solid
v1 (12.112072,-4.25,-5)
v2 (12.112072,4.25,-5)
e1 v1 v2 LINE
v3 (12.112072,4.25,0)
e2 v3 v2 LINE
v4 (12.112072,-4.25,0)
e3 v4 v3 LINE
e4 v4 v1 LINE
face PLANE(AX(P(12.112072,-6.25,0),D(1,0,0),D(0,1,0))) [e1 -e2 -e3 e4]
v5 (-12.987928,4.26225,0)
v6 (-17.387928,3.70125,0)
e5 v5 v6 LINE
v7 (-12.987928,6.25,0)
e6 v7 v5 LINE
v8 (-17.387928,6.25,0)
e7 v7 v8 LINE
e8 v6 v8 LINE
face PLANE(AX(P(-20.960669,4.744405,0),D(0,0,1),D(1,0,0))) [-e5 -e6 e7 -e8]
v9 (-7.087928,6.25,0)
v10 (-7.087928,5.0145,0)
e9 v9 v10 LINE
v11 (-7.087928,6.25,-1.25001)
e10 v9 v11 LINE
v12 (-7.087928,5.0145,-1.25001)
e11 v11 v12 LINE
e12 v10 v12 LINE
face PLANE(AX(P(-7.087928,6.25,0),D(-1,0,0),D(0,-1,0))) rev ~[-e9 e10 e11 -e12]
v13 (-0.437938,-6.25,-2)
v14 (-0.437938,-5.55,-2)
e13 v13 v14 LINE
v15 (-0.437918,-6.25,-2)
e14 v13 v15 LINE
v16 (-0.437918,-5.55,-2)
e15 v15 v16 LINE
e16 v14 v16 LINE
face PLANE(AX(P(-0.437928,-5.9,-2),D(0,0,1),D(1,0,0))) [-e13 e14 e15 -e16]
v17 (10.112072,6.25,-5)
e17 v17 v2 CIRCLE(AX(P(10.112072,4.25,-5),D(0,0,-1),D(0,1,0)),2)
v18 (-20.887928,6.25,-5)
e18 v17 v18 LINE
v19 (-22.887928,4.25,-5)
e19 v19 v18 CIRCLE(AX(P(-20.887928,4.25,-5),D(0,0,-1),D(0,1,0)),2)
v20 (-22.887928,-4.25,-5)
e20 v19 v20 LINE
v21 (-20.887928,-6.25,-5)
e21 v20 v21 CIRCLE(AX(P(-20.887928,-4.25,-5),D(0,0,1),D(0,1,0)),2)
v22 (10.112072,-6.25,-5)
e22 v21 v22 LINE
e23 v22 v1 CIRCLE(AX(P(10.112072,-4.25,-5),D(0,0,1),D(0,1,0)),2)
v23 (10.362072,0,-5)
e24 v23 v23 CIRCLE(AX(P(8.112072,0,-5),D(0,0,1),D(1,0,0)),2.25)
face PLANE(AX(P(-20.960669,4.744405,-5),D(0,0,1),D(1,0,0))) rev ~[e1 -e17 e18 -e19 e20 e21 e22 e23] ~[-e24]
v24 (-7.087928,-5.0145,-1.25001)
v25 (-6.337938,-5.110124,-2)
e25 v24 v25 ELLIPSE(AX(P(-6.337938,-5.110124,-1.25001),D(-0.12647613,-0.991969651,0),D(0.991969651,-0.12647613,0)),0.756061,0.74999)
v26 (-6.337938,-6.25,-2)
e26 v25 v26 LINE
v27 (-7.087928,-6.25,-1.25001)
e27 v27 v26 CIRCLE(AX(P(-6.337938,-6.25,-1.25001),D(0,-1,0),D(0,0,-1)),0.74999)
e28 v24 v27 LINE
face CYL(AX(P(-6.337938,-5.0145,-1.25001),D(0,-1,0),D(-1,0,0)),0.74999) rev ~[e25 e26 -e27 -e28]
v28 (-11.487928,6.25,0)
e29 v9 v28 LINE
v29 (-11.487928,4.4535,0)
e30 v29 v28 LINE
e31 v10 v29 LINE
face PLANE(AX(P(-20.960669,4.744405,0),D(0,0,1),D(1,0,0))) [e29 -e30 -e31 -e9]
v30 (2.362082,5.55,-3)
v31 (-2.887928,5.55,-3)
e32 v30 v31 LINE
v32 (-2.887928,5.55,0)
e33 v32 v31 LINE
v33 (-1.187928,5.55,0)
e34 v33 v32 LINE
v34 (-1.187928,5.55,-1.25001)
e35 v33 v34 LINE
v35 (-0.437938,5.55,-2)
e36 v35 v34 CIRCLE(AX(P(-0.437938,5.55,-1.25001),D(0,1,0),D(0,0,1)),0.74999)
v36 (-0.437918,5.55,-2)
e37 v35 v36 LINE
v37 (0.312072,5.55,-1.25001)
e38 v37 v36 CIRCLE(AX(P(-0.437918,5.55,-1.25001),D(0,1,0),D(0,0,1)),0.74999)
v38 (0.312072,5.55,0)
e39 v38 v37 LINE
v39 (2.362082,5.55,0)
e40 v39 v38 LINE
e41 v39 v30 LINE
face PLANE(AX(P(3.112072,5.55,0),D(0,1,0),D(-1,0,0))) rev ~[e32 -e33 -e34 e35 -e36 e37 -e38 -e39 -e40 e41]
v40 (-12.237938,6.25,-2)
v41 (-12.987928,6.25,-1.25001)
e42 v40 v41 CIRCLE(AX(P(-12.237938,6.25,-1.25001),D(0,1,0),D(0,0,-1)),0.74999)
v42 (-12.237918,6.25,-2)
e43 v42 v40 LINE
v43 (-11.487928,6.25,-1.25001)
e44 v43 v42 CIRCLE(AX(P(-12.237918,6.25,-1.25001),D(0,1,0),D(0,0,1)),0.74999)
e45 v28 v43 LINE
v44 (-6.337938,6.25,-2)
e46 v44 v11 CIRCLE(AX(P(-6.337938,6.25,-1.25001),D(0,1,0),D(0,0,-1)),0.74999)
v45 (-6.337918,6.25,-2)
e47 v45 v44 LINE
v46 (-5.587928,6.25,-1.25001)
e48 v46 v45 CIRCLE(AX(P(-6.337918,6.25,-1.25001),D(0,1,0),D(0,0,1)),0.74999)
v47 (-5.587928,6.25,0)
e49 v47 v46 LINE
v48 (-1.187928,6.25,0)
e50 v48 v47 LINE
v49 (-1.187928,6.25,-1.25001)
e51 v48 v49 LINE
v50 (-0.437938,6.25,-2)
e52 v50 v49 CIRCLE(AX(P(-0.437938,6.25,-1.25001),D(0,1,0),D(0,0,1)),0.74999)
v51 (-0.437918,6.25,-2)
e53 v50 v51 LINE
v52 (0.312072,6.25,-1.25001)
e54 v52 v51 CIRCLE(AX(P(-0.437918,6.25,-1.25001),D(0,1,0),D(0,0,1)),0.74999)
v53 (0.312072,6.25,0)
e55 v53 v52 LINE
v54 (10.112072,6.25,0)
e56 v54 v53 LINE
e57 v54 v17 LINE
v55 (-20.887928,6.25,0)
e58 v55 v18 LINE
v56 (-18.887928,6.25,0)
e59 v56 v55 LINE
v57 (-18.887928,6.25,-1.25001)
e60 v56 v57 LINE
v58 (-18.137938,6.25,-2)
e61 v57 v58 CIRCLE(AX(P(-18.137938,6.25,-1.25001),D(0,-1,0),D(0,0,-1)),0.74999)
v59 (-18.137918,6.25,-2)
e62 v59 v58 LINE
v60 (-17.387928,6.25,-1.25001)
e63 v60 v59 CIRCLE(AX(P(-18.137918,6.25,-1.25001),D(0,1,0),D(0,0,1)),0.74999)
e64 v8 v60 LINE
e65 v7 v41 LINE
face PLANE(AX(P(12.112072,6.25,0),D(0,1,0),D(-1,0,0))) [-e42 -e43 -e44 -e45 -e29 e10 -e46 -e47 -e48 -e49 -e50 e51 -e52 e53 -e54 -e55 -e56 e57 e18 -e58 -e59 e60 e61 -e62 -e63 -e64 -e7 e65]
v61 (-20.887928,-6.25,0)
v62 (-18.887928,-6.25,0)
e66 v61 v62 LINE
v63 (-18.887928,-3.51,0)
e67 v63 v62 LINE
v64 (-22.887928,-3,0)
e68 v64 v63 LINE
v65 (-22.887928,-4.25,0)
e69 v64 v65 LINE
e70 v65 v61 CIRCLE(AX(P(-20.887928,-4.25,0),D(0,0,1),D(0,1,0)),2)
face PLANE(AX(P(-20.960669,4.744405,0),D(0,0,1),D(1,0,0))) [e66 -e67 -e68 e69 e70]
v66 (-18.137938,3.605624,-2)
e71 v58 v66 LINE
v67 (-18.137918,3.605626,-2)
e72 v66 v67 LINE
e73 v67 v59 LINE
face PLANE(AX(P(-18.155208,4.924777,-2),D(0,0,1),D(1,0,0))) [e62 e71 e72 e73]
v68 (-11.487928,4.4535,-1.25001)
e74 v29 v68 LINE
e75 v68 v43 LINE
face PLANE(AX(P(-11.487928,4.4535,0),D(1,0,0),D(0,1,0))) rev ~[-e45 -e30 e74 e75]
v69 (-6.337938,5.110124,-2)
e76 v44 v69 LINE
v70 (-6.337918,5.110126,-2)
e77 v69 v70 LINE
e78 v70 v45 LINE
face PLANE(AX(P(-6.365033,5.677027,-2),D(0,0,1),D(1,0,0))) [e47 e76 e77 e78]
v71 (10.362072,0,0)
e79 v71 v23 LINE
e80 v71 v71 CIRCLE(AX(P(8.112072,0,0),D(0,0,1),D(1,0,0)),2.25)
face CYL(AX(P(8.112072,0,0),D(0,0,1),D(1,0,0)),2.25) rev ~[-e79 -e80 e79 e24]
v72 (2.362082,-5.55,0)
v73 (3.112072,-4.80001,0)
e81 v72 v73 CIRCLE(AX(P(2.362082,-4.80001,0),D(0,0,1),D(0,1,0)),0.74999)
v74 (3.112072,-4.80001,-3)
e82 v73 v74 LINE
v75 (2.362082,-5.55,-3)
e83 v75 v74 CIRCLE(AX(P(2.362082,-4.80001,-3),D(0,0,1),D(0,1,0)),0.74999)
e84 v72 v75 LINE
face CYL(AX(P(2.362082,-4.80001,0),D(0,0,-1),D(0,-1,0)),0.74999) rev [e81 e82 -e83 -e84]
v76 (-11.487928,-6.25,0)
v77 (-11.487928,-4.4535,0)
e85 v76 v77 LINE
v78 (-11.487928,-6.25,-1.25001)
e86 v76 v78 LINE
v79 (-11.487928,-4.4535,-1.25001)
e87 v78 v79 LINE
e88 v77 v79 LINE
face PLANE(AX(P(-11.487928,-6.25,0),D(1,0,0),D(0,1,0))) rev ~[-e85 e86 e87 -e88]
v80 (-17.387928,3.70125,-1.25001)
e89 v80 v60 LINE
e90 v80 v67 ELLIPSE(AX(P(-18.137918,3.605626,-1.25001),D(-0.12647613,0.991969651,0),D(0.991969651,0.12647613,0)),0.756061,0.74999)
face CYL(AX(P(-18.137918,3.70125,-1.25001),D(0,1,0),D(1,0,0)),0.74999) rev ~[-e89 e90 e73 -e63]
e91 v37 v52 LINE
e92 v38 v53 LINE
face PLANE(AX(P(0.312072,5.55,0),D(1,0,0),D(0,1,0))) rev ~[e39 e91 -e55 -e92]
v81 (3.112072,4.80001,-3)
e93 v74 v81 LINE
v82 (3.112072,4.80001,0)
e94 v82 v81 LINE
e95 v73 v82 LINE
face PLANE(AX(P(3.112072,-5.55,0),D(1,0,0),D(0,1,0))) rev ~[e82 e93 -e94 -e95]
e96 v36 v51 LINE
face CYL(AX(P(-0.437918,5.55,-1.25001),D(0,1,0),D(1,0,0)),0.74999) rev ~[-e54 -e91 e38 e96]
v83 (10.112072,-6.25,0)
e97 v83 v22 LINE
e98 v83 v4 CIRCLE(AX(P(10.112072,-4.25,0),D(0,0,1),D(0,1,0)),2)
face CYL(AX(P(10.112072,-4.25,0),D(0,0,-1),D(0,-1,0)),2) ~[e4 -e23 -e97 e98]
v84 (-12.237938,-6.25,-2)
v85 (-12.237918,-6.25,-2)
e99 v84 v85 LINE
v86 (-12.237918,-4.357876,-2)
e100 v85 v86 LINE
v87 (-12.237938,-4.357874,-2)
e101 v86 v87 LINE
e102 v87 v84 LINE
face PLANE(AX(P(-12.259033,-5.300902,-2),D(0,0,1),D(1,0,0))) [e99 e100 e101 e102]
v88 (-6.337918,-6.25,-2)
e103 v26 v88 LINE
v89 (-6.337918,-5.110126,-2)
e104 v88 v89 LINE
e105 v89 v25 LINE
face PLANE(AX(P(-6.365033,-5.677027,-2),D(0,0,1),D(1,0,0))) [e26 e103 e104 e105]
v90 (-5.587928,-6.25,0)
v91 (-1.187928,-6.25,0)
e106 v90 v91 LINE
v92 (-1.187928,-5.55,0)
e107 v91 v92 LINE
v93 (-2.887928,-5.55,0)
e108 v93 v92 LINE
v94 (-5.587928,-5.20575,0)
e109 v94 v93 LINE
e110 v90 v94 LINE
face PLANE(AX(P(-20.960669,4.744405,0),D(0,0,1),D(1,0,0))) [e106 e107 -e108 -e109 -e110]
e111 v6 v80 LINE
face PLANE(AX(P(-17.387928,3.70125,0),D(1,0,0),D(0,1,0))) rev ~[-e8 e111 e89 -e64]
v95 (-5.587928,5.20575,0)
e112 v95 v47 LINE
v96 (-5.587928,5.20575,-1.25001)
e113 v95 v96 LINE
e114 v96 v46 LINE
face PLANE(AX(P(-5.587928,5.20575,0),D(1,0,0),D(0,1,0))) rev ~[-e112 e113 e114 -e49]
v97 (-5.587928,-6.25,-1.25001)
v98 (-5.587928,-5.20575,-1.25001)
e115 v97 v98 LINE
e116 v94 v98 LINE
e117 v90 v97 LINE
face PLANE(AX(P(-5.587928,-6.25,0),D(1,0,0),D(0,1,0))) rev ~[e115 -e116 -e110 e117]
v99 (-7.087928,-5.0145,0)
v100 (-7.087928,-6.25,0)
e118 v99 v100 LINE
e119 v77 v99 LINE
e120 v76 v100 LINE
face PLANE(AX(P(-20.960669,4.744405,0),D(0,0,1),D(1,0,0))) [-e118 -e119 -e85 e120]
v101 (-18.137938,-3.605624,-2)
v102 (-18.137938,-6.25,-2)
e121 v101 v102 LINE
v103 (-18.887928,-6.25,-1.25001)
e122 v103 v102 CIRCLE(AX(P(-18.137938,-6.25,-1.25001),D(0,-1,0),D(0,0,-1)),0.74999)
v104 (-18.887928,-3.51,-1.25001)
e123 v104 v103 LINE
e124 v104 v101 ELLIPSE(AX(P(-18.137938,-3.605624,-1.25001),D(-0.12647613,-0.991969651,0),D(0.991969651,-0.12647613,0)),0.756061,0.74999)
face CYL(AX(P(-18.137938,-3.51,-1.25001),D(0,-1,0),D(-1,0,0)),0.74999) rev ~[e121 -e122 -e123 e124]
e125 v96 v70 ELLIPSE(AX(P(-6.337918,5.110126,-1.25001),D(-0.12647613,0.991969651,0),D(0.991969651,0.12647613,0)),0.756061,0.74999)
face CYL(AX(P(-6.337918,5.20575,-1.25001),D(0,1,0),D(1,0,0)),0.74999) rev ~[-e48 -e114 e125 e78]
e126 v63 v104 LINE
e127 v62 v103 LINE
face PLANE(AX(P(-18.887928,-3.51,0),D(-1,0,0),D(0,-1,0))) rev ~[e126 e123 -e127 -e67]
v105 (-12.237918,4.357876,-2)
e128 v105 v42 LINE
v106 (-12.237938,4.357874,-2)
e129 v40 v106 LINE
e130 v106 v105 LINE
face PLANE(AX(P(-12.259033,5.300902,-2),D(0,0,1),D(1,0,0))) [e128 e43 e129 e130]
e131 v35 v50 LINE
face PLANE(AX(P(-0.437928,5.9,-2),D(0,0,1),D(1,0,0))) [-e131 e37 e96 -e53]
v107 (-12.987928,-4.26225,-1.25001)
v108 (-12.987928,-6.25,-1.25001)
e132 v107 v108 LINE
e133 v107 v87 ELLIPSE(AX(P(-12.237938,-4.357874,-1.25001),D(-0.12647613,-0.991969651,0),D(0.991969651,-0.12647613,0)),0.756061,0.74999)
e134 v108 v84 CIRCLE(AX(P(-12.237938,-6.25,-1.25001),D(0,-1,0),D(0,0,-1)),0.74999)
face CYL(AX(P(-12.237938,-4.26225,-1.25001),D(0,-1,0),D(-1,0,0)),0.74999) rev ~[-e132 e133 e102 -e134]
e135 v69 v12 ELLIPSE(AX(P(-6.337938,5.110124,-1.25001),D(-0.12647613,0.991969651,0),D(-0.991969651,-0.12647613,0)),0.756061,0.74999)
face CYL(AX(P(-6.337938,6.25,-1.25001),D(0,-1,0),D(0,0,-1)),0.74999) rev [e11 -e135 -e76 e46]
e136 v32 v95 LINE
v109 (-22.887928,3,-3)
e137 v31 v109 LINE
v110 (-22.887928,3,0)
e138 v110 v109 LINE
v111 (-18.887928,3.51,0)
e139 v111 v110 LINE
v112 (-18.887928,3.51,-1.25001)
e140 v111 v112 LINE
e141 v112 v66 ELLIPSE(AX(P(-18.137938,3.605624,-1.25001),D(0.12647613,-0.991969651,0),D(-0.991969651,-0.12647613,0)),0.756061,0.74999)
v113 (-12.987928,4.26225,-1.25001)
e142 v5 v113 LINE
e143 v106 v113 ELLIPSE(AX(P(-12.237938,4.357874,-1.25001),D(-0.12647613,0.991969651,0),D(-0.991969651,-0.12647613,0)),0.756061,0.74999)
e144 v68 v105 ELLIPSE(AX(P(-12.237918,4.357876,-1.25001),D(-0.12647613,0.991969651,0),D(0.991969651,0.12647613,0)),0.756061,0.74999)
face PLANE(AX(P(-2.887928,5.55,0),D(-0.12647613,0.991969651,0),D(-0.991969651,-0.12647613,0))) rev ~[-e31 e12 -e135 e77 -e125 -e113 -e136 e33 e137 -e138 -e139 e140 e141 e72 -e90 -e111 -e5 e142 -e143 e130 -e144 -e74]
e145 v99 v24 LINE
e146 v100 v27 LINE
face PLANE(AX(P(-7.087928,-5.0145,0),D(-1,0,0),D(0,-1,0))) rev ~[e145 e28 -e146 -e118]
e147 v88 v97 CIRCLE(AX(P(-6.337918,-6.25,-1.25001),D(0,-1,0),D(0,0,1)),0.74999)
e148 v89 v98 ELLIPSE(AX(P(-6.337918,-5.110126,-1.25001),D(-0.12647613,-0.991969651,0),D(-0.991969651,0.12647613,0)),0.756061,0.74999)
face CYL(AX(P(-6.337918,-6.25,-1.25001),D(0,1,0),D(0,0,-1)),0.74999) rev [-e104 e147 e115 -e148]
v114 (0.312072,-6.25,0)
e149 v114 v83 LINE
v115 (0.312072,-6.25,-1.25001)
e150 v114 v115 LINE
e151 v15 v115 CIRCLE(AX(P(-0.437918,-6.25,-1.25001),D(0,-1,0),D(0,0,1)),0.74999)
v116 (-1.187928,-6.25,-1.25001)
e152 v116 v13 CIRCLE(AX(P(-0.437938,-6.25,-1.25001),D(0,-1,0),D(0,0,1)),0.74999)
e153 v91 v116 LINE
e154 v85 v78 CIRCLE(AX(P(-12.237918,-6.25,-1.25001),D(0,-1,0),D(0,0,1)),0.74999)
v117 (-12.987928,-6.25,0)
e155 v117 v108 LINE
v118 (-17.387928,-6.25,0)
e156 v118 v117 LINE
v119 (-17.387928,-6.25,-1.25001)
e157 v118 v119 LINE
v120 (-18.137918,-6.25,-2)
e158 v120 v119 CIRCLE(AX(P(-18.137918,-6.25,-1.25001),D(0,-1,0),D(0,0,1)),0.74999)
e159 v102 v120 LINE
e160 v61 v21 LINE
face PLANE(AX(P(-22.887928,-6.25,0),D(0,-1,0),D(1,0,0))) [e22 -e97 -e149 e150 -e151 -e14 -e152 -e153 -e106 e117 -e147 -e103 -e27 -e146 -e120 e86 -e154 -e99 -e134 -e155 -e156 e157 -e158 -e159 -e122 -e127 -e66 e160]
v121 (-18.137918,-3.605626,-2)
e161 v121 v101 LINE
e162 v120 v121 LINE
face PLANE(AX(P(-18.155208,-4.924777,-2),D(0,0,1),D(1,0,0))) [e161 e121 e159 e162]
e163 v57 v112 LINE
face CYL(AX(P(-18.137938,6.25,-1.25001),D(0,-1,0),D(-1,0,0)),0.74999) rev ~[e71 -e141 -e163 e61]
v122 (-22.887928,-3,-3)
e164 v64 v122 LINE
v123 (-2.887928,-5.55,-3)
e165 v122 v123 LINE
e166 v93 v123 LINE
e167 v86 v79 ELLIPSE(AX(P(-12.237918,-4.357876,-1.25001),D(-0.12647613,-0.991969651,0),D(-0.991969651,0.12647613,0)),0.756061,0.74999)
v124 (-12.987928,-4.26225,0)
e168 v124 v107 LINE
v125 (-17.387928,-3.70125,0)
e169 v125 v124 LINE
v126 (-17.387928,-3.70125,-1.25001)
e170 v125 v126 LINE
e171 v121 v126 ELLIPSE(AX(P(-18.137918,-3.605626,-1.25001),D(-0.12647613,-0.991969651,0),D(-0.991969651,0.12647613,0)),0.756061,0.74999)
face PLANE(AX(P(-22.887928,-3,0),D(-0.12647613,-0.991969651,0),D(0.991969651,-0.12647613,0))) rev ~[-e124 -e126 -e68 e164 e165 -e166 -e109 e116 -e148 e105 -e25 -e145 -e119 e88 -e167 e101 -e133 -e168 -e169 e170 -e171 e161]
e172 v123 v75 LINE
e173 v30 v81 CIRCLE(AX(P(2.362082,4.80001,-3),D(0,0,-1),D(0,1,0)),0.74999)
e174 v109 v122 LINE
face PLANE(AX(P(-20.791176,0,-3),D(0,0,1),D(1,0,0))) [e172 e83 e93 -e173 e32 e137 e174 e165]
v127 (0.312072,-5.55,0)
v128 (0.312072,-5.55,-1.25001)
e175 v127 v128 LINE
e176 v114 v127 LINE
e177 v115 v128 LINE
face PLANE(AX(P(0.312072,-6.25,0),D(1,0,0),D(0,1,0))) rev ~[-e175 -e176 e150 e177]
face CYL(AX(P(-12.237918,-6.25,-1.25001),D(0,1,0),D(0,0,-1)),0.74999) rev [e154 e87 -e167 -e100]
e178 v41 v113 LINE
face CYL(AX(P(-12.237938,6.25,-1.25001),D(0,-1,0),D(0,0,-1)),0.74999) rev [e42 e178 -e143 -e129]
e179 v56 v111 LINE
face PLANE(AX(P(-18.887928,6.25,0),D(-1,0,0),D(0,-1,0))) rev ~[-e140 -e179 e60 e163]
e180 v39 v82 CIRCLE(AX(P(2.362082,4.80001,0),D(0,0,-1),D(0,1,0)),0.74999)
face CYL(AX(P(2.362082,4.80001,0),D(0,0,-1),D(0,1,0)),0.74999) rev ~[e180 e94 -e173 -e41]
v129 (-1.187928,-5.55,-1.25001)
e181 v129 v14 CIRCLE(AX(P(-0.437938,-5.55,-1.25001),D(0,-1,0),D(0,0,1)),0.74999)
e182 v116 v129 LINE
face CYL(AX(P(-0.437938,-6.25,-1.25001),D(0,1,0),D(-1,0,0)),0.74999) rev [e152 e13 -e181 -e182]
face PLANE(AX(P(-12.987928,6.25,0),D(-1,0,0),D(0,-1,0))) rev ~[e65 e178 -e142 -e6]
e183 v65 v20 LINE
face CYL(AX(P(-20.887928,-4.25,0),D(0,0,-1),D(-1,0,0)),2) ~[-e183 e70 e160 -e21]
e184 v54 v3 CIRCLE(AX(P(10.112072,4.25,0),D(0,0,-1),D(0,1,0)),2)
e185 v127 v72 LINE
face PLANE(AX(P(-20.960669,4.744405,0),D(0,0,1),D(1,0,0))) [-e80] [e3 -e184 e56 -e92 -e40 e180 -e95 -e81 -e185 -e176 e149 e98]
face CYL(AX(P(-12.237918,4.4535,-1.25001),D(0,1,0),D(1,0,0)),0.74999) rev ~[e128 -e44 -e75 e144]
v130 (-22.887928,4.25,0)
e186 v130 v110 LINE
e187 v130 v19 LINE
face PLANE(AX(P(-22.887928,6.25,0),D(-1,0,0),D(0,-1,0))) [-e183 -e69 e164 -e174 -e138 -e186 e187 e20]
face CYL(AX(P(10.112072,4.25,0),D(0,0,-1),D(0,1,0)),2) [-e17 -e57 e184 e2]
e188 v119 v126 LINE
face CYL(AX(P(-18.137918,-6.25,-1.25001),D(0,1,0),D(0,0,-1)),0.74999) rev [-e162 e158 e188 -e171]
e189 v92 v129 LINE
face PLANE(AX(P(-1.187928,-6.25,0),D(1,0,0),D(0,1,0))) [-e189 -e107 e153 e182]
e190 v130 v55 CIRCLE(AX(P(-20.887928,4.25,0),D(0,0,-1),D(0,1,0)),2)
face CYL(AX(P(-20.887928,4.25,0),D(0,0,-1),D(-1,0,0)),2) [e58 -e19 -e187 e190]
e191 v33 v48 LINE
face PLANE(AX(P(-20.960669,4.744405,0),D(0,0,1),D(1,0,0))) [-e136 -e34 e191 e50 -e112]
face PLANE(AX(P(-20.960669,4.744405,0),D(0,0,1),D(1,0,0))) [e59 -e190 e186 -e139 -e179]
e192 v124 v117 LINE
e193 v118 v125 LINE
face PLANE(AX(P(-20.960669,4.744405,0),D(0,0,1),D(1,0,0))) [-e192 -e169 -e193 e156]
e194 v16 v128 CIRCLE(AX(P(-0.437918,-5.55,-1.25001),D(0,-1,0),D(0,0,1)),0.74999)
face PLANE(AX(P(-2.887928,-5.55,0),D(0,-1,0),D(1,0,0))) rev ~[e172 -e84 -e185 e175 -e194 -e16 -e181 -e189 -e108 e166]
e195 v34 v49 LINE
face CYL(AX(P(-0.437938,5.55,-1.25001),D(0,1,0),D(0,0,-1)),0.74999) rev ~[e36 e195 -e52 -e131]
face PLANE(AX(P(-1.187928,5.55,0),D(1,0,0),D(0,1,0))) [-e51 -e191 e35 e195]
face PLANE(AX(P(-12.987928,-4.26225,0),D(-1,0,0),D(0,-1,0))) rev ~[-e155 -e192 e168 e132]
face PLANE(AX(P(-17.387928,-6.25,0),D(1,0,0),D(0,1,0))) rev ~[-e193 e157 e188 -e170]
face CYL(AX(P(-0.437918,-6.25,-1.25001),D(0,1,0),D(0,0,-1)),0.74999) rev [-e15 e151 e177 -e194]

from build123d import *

# Parameters (mm, degrees)
F0_W     = 1.5
F0_H     = 0.7
F0_R     = 2.25
F0_H_2   = 11.1
F0_W_2   = 2.8
F1_DEPTH = 5
F2_DEPTH = 3
F3_DEPTH = 2
F4_R     = 0.74999
F5_R     = 2


# Not quite as in the source:
# - a fillet or chamfer is up to 0.001 mm smaller than in the source, because OpenCascade refuses the exact size


with BuildPart() as f1:
    # F0 (on Top) → F1 (new body)
    with BuildSketch(Plane.XY):
        Polygon((-18.8879279066, 6.25), (-22.8879279066, 6.25), (-22.8879279066, 3), (-18.8879279066, 3.51), align=None)
        Polygon((-17.3879279066, 6.25), (-18.8879279066, 6.25), (-18.8879279066, 3.51), (-17.3879279066, 3.70125), align=None)
        Polygon((-18.8879279066, 3.51), (-22.8879279066, 3), (-22.8879279066, -3), (-18.8879279066, -3.51), align=None)
        Polygon((-12.9879279066, 6.25), (-17.3879279066, 6.25), (-17.3879279066, 3.70125), (-12.9879279066, 4.26225), align=None)
        Polygon((-18.8879279066, -3.51), (-22.8879279066, -3), (-22.8879279066, -6.25), (-18.8879279066, -6.25), align=None)
        Polygon((-11.4879279066, 6.25), (-12.9879279066, 6.25), (-12.9879279066, 4.26225), (-11.4879279066, 4.4535), align=None)
        Polygon((-17.3879279066, -3.70125), (-18.8879279066, -3.51), (-18.8879279066, -6.25), (-17.3879279066, -6.25), align=None)
        Polygon((-7.0879279066, 6.25), (-11.4879279066, 6.25), (-11.4879279066, 4.4535), (-7.0879279066, 5.0145), align=None)
        Polygon((-12.9879279066, -4.26225), (-17.3879279066, -3.70125), (-17.3879279066, -6.25), (-12.9879279066, -6.25), align=None)
        Polygon((-5.5879279066, 6.25), (-7.0879279066, 6.25), (-7.0879279066, 5.0145), (-5.5879279066, 5.20575), align=None)
        Polygon((-11.4879279066, -4.4535), (-12.9879279066, -4.26225), (-12.9879279066, -6.25), (-11.4879279066, -6.25), align=None)
        Polygon((-1.1879279066, 6.25), (-5.5879279066, 6.25), (-5.5879279066, 5.20575), (-2.8879279066, 5.55), (-1.1879279066, 5.55), align=None)
        Polygon((-7.0879279066, -5.0145), (-11.4879279066, -4.4535), (-11.4879279066, -6.25), (-7.0879279066, -6.25), align=None)
        with Locations((-0.4379279066, 5.9)):
            Rectangle(F0_W, F0_H)
        Polygon((-5.5879279066, -5.20575), (-7.0879279066, -5.0145), (-7.0879279066, -6.25), (-5.5879279066, -6.25), align=None)
        Polygon((12.1120720934, 6.25), (0.3120720934, 6.25), (0.3120720934, 5.55), (3.1120720934, 5.55), (3.1120720934, -5.55), (0.3120720934, -5.55), (0.3120720934, -6.25), (12.1120720934, -6.25), align=None)
        with Locations((8.1120720934, 0)):
            Circle(F0_R, mode=Mode.SUBTRACT)
        Polygon((-2.8879279066, -5.55), (-5.5879279066, -5.20575), (-5.5879279066, -6.25), (-1.1879279066, -6.25), (-1.1879279066, -5.55), align=None)
        with Locations((-0.4379279066, -5.9)):
            Rectangle(F0_W, F0_H)
        with Locations((-0.4379279066, 0)):
            Rectangle(F0_W, F0_H_2)
        Polygon((-5.5879279066, 5.20575), (-7.0879279066, 5.0145), (-7.0879279066, -5.0145), (-5.5879279066, -5.20575), align=None)
        Polygon((-17.3879279066, 3.70125), (-18.8879279066, 3.51), (-18.8879279066, -3.51), (-17.3879279066, -3.70125), align=None)
        Polygon((-12.9879279066, 4.26225), (-17.3879279066, 3.70125), (-17.3879279066, -3.70125), (-12.9879279066, -4.26225), align=None)
        Polygon((-7.0879279066, 5.0145), (-11.4879279066, 4.4535), (-11.4879279066, -4.4535), (-7.0879279066, -5.0145), align=None)
        Polygon((-11.4879279066, 4.4535), (-12.9879279066, 4.26225), (-12.9879279066, -4.26225), (-11.4879279066, -4.4535), align=None)
        Polygon((-2.8879279066, 5.55), (-5.5879279066, 5.20575), (-5.5879279066, -5.20575), (-2.8879279066, -5.55), (-1.1879279066, -5.55), (-1.1879279066, 5.55), align=None)
        with Locations((1.7120720934, 0)):
            Rectangle(F0_W_2, F0_H_2)
    extrude(amount=-F1_DEPTH)

    # F0 (on Top) → F2 (cut)
    with BuildSketch(Plane.XY):
        Polygon((-18.8879279066, 3.51), (-22.8879279066, 3), (-22.8879279066, -3), (-18.8879279066, -3.51), align=None)
        Polygon((-17.3879279066, 3.70125), (-18.8879279066, 3.51), (-18.8879279066, -3.51), (-17.3879279066, -3.70125), align=None)
        Polygon((-12.9879279066, 4.26225), (-17.3879279066, 3.70125), (-17.3879279066, -3.70125), (-12.9879279066, -4.26225), align=None)
        Polygon((-11.4879279066, 4.4535), (-12.9879279066, 4.26225), (-12.9879279066, -4.26225), (-11.4879279066, -4.4535), align=None)
        Polygon((-7.0879279066, 5.0145), (-11.4879279066, 4.4535), (-11.4879279066, -4.4535), (-7.0879279066, -5.0145), align=None)
        Polygon((-5.5879279066, 5.20575), (-7.0879279066, 5.0145), (-7.0879279066, -5.0145), (-5.5879279066, -5.20575), align=None)
        Polygon((-2.8879279066, 5.55), (-5.5879279066, 5.20575), (-5.5879279066, -5.20575), (-2.8879279066, -5.55), (-1.1879279066, -5.55), (-1.1879279066, 5.55), align=None)
        with Locations((-0.4379279066, 0)):
            Rectangle(F0_W, F0_H_2)
        with Locations((1.7120720934, 0)):
            Rectangle(F0_W_2, F0_H_2)
    extrude(amount=-F2_DEPTH, mode=Mode.SUBTRACT)

    # F0 (on Top) → F3 (cut)
    with BuildSketch(Plane.XY):
        Polygon((-17.3879279066, 6.25), (-18.8879279066, 6.25), (-18.8879279066, 3.51), (-17.3879279066, 3.70125), align=None)
        Polygon((-11.4879279066, 6.25), (-12.9879279066, 6.25), (-12.9879279066, 4.26225), (-11.4879279066, 4.4535), align=None)
        Polygon((-5.5879279066, 6.25), (-7.0879279066, 6.25), (-7.0879279066, 5.0145), (-5.5879279066, 5.20575), align=None)
        with Locations((-0.4379279066, -5.9)):
            Rectangle(F0_W, F0_H)
        Polygon((-17.3879279066, -3.70125), (-18.8879279066, -3.51), (-18.8879279066, -6.25), (-17.3879279066, -6.25), align=None)
        Polygon((-11.4879279066, -4.4535), (-12.9879279066, -4.26225), (-12.9879279066, -6.25), (-11.4879279066, -6.25), align=None)
        Polygon((-5.5879279066, -5.20575), (-7.0879279066, -5.0145), (-7.0879279066, -6.25), (-5.5879279066, -6.25), align=None)
        with Locations((-0.4379279066, 5.9)):
            Rectangle(F0_W, F0_H)
    extrude(amount=-F3_DEPTH, mode=Mode.SUBTRACT)

    # F4 (radius 0.75 in the source; OpenCascade refuses exactly that, so slightly less here)
    f4_edges = [f1.edges().sort_by_distance(p)[0] for p in [
        (-17.387928, -4.975625, -2),
        (-11.487928, -5.35175, -2),
        (-5.587928, -5.727875, -2),
        (0.312072, -5.9, -2),
        (-18.887928, -4.88, -2),
        (-12.987928, -5.256125, -2),
        (-7.087928, -5.63225, -2),
        (-1.187928, -5.9, -2),
        (-18.887928, 4.88, -2),
        (-12.987928, 5.256125, -2),
        (-7.087928, 5.63225, -2),
        (-1.187928, 5.9, -2),
        (-17.387928, 4.975625, -2),
        (-11.487928, 5.35175, -2),
        (-5.587928, 5.727875, -2),
        (0.312072, 5.9, -2),
        (3.112072, 5.55, -1.5),
        (3.112072, -5.55, -1.5),
    ]]
    fillet(f4_edges, radius=F4_R)

    # F5
    f5_edges = [f1.edges().sort_by_distance(p)[0] for p in [
        (-22.887928, -6.25, -2.5),
        (-22.887928, 6.25, -2.5),
        (12.112072, -6.25, -2.5),
        (12.112072, 6.25, -2.5),
    ]]
    fillet(f5_edges, radius=F5_R)


solid = f1.part
